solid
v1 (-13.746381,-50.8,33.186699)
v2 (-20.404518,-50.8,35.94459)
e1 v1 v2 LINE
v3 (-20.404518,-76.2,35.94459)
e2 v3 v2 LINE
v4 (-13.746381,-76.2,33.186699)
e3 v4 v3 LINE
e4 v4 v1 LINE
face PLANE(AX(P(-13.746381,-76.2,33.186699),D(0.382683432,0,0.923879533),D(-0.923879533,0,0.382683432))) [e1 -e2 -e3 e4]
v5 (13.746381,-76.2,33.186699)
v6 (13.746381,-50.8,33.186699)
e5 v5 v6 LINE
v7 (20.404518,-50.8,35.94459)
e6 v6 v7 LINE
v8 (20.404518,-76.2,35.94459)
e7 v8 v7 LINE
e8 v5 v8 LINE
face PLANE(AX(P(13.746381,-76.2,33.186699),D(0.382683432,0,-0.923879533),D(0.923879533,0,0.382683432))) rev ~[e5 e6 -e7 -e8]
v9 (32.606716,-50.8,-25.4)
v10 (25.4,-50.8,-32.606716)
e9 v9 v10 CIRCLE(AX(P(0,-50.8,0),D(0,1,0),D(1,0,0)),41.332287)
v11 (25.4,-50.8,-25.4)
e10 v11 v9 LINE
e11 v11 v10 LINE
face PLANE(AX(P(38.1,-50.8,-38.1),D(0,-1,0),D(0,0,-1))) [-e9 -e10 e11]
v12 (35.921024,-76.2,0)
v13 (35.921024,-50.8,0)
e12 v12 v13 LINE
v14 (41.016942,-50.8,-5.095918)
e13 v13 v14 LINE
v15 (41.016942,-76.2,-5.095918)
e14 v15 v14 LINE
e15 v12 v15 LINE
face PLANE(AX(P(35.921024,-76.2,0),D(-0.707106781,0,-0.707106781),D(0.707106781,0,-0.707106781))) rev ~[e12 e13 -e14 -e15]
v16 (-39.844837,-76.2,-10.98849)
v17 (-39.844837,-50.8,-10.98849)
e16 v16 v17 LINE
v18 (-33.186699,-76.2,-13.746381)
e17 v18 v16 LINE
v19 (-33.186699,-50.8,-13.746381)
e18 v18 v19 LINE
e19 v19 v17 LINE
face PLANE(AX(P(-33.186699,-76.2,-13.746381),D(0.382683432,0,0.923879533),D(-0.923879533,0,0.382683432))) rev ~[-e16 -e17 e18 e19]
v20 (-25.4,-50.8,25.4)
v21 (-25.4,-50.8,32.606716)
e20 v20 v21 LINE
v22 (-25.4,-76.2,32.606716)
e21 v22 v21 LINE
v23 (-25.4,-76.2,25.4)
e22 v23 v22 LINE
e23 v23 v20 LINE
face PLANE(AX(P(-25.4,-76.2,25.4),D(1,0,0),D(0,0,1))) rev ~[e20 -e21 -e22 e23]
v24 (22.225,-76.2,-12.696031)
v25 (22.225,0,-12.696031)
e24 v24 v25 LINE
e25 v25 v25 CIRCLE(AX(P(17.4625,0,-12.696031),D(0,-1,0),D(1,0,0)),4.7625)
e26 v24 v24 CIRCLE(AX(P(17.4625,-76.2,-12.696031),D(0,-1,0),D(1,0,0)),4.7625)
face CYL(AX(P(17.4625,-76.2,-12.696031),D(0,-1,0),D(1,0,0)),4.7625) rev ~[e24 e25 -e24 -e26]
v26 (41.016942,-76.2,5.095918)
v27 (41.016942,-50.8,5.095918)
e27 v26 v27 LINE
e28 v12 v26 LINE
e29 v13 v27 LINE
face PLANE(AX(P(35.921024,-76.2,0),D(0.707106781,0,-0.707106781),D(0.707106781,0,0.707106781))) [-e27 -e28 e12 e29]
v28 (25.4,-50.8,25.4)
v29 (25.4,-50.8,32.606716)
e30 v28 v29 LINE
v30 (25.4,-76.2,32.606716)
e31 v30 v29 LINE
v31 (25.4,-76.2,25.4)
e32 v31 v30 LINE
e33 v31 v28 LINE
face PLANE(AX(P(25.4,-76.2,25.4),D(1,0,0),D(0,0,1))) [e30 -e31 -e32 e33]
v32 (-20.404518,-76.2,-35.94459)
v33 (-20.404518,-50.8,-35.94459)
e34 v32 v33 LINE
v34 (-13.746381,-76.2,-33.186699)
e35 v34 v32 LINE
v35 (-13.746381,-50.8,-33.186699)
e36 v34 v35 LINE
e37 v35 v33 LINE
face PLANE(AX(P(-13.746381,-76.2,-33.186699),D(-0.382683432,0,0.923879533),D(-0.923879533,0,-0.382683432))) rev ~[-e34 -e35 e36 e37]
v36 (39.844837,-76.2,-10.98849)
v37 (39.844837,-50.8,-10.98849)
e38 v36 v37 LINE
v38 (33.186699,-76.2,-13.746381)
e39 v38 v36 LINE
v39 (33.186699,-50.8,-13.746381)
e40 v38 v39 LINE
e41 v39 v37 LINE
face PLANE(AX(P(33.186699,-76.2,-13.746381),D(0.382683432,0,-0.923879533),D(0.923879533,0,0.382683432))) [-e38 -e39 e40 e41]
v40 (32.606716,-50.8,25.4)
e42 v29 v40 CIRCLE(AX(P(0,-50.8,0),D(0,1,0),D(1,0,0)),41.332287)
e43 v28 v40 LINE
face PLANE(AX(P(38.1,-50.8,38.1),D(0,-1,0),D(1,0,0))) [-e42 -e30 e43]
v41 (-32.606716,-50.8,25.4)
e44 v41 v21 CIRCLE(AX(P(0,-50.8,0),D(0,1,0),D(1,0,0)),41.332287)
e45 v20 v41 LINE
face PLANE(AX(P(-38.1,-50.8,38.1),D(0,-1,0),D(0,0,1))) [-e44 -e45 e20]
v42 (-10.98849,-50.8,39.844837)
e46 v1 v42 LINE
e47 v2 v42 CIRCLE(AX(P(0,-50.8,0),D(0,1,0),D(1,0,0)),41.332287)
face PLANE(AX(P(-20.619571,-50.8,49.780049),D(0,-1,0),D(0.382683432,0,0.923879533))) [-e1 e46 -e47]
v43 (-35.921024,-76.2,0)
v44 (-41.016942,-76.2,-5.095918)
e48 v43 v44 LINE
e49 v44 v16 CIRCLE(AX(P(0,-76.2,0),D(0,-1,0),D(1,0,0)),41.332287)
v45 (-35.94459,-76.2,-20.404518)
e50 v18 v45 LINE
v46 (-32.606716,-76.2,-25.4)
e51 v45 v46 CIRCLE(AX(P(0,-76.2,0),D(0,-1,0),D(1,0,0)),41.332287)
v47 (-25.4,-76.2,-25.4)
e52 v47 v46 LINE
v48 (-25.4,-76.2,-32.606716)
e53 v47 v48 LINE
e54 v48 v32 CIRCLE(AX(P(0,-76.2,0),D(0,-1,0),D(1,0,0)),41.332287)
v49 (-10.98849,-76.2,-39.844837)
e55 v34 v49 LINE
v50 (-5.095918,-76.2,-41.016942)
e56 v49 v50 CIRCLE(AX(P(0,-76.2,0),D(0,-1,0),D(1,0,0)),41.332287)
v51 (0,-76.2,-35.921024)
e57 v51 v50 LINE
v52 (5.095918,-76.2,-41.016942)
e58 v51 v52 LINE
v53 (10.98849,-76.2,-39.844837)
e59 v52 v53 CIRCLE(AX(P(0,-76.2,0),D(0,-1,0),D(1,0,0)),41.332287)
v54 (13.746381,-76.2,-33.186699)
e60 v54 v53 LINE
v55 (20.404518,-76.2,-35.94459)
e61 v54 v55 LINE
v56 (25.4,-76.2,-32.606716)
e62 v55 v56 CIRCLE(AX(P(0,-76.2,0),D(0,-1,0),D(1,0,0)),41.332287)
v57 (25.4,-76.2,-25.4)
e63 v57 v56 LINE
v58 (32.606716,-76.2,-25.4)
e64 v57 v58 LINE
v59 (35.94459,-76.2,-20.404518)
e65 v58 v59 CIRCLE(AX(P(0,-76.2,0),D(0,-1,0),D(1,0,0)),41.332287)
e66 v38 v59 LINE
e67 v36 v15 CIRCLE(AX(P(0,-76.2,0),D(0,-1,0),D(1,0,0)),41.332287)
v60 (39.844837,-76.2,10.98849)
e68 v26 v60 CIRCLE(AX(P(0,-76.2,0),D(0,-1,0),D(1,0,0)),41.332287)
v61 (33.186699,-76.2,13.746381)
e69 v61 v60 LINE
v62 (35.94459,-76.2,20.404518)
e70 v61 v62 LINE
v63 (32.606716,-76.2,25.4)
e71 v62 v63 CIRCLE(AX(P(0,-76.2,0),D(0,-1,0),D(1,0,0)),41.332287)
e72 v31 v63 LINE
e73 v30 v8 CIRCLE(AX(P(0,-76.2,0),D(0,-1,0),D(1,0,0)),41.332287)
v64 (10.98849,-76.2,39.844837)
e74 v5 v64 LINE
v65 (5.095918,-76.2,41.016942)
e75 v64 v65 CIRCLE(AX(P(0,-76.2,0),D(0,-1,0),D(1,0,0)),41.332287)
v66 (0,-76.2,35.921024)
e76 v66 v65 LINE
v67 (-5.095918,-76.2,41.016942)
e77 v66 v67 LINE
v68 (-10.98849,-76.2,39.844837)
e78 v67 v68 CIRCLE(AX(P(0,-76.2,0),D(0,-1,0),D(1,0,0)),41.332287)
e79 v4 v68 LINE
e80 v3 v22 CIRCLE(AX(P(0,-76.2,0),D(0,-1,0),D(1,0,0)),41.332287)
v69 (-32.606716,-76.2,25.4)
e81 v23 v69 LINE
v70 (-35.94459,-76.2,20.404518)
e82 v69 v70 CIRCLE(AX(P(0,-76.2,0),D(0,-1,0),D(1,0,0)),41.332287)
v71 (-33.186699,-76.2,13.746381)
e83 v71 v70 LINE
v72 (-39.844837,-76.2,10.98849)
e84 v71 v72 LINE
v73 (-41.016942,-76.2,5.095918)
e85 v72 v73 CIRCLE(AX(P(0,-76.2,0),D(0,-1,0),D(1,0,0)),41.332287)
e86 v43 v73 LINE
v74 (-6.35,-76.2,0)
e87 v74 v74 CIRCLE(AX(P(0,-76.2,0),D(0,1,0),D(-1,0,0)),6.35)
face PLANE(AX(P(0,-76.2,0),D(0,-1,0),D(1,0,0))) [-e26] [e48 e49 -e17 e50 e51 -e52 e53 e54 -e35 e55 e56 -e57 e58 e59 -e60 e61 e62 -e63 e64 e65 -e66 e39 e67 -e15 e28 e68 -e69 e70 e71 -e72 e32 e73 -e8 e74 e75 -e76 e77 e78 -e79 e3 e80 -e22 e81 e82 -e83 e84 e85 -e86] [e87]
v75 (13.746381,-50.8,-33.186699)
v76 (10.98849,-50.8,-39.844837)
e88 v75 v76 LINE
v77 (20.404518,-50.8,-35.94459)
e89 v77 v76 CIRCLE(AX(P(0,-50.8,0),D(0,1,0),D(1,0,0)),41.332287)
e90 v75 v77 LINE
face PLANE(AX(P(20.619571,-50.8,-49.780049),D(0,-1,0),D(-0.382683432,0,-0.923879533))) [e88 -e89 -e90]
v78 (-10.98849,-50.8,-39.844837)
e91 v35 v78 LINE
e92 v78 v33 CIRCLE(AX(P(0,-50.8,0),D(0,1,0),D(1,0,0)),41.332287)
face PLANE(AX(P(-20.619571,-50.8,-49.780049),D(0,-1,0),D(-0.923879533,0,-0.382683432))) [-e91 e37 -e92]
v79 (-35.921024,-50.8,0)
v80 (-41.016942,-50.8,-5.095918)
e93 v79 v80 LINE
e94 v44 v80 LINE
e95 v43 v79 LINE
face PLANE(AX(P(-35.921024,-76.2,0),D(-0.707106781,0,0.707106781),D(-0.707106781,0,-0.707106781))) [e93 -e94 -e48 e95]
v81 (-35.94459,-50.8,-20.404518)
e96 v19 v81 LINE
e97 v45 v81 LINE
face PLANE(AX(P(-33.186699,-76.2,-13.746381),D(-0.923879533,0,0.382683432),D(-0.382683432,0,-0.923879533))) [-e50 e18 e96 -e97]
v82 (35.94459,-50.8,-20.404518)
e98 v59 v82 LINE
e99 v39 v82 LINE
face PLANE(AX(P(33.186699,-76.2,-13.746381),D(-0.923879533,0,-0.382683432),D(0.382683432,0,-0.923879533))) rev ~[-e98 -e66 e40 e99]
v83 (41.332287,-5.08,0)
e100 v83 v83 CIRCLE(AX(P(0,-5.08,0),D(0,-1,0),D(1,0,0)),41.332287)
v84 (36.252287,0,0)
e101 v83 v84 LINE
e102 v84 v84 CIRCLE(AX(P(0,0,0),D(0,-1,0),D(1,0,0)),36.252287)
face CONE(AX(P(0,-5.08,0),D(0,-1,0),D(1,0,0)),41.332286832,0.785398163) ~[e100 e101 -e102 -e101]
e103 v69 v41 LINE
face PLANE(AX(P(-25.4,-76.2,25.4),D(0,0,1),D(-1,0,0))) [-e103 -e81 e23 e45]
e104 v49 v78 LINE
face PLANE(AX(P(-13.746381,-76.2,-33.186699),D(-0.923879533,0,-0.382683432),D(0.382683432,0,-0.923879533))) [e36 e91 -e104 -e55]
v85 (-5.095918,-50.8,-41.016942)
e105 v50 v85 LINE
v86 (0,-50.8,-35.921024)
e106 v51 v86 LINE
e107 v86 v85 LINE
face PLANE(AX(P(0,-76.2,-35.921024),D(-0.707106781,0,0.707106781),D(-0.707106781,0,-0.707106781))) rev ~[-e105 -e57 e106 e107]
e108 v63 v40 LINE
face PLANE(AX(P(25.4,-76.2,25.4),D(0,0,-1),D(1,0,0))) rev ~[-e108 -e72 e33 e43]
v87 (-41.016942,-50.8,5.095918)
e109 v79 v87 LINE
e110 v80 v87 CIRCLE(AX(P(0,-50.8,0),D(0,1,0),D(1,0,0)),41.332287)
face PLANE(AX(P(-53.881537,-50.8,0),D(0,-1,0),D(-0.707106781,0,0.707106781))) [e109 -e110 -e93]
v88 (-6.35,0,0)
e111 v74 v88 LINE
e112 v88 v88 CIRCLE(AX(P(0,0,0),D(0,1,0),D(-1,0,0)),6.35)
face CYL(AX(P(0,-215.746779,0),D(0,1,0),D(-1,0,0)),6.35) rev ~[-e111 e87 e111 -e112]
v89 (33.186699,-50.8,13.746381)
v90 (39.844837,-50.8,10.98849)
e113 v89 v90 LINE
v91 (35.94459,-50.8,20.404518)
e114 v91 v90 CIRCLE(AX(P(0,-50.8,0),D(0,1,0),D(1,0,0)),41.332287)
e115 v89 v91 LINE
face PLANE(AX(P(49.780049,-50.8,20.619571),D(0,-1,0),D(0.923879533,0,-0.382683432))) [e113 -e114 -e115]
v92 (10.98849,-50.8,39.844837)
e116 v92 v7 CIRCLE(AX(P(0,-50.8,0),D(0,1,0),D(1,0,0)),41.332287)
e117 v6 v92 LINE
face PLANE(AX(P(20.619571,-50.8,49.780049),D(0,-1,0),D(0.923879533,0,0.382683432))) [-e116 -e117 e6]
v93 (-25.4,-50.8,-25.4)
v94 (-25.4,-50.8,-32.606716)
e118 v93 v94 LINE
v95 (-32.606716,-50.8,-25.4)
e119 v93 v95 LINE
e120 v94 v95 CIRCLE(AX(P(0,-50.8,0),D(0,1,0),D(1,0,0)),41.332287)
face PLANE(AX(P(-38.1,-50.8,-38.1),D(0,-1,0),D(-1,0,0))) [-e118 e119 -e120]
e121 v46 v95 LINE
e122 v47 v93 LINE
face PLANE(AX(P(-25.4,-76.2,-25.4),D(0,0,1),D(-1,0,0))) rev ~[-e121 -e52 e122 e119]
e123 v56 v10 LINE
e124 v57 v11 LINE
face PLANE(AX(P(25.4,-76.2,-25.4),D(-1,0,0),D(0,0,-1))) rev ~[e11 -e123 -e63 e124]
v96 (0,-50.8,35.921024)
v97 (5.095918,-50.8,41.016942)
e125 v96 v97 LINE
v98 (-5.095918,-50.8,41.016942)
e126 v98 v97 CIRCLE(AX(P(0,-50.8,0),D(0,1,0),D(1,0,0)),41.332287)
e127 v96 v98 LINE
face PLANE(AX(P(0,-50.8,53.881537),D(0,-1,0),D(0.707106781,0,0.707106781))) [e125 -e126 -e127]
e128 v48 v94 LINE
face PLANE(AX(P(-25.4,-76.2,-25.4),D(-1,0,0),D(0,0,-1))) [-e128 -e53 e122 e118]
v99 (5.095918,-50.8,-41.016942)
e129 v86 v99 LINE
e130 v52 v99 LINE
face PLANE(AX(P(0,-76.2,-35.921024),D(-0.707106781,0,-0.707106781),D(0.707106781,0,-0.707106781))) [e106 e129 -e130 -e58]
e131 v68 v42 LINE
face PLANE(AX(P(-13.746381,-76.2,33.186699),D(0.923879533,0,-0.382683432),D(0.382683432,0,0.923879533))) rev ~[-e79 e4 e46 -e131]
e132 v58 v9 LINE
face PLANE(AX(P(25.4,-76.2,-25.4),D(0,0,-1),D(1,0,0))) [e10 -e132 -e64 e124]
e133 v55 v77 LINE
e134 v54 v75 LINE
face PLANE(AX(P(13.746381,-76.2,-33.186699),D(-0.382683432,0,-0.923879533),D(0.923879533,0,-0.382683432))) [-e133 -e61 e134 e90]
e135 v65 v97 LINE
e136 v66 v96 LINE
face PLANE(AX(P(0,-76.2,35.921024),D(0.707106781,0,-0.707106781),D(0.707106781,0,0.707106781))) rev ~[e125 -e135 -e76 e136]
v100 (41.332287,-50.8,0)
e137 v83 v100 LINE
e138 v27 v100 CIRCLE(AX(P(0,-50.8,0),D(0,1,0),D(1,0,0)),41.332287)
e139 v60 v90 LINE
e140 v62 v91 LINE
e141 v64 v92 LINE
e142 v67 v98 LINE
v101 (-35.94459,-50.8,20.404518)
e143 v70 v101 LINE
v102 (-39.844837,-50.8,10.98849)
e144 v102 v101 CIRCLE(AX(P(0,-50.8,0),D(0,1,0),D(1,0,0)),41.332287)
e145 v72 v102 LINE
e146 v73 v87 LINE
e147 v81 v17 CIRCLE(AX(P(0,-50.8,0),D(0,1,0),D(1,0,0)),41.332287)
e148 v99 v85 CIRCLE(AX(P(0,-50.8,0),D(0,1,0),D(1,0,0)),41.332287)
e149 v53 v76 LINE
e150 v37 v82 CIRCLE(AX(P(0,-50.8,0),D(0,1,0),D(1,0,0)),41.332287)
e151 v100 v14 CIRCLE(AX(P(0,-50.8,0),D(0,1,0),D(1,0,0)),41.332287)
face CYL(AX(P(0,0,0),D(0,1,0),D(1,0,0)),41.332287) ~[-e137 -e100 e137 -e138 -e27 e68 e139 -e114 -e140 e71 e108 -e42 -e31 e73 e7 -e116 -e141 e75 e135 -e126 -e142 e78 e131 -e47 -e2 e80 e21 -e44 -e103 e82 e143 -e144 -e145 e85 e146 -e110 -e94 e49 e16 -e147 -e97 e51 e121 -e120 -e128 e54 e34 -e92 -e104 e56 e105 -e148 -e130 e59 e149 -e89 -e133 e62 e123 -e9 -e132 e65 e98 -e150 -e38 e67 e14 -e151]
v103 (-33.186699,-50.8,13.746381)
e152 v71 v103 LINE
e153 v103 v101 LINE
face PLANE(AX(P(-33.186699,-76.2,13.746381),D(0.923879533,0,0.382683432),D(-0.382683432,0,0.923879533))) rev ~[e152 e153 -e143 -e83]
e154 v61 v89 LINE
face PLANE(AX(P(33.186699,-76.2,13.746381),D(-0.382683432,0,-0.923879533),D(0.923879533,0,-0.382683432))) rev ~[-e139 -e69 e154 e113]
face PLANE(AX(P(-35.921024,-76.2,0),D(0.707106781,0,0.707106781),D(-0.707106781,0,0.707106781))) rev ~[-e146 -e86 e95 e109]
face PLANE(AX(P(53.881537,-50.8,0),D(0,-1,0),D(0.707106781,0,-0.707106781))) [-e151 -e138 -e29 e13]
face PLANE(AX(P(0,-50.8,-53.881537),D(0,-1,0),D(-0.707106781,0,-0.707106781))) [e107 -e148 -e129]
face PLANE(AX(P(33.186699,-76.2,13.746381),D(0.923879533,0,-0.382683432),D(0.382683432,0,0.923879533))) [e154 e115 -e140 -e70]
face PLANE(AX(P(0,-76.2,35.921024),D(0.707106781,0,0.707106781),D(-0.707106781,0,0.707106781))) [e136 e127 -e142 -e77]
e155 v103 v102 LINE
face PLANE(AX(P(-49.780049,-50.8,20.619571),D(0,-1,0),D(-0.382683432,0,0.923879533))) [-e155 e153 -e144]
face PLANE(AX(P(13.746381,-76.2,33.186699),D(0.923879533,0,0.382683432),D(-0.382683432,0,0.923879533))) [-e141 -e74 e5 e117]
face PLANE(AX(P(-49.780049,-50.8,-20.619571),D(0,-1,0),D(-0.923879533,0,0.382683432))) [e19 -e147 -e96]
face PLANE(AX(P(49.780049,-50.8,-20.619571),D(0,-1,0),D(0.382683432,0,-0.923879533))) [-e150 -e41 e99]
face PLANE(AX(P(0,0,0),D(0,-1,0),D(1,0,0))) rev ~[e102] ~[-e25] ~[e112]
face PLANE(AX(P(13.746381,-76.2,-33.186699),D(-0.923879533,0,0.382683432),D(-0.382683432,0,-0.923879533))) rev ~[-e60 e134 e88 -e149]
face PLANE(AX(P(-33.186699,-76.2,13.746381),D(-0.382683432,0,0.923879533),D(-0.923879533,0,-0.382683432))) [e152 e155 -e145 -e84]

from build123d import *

# Parameters (mm, degrees)
F0_R            = 41.3322868319
F1_DEPTH        = 76.2
F2_W            = 25.4
F2_H            = 25.4
F3_DEPTH        = 25.4
F3_COPIES_COUNT = 16
F4_SIZE         = 5.08
F6_D            = 12.7
F7_R            = 4.7625
F8_DEPTH        = 76.2


# Not quite as in the source:
# - a pattern or mirror of a feature is missing from the dataset's text; its kind, count and spacing are read off the source's solid


with BuildPart() as f1:
    # F0 (on Front) → F1 (new body)
    with BuildSketch(Plane.XZ):
        Circle(F0_R)
    extrude(amount=F1_DEPTH)

    # F2 (on face) → F3 (cut)
    with BuildSketch(Plane.XZ.offset(76.2)):
        with Locations((38.1, 38.1)):
            Rectangle(F2_W, F2_H)
    f3 = extrude(amount=-F3_DEPTH, mode=Mode.SUBTRACT)

    # F3_copies: F3 ×16 about axis
    f3_copies_axis = Axis((0, 0, 0), (0, 1, 0))
    for i in range(1, F3_COPIES_COUNT):
        add(f3.rotate(f3_copies_axis, i * 360 / F3_COPIES_COUNT), mode=Mode.SUBTRACT)

    # F4
    f4_edges = [f1.edges().sort_by_distance(p)[0] for p in [
        (-41.332287, 0, 0),
    ]]
    chamfer(f4_edges, length=F4_SIZE)

    # F6 (through all)
    with Locations(Plane.XZ.offset(76.2)):
        with Locations((0, 0)):
            Hole(F6_D / 2)

    # F7 (on face) → F8 (cut, through all)
    with BuildSketch(Plane.XZ.offset(76.2)):
        with Locations((17.4625, -12.6960306297)):
            Circle(F7_R)
    extrude(amount=-F8_DEPTH, mode=Mode.SUBTRACT)


solid = f1.part
